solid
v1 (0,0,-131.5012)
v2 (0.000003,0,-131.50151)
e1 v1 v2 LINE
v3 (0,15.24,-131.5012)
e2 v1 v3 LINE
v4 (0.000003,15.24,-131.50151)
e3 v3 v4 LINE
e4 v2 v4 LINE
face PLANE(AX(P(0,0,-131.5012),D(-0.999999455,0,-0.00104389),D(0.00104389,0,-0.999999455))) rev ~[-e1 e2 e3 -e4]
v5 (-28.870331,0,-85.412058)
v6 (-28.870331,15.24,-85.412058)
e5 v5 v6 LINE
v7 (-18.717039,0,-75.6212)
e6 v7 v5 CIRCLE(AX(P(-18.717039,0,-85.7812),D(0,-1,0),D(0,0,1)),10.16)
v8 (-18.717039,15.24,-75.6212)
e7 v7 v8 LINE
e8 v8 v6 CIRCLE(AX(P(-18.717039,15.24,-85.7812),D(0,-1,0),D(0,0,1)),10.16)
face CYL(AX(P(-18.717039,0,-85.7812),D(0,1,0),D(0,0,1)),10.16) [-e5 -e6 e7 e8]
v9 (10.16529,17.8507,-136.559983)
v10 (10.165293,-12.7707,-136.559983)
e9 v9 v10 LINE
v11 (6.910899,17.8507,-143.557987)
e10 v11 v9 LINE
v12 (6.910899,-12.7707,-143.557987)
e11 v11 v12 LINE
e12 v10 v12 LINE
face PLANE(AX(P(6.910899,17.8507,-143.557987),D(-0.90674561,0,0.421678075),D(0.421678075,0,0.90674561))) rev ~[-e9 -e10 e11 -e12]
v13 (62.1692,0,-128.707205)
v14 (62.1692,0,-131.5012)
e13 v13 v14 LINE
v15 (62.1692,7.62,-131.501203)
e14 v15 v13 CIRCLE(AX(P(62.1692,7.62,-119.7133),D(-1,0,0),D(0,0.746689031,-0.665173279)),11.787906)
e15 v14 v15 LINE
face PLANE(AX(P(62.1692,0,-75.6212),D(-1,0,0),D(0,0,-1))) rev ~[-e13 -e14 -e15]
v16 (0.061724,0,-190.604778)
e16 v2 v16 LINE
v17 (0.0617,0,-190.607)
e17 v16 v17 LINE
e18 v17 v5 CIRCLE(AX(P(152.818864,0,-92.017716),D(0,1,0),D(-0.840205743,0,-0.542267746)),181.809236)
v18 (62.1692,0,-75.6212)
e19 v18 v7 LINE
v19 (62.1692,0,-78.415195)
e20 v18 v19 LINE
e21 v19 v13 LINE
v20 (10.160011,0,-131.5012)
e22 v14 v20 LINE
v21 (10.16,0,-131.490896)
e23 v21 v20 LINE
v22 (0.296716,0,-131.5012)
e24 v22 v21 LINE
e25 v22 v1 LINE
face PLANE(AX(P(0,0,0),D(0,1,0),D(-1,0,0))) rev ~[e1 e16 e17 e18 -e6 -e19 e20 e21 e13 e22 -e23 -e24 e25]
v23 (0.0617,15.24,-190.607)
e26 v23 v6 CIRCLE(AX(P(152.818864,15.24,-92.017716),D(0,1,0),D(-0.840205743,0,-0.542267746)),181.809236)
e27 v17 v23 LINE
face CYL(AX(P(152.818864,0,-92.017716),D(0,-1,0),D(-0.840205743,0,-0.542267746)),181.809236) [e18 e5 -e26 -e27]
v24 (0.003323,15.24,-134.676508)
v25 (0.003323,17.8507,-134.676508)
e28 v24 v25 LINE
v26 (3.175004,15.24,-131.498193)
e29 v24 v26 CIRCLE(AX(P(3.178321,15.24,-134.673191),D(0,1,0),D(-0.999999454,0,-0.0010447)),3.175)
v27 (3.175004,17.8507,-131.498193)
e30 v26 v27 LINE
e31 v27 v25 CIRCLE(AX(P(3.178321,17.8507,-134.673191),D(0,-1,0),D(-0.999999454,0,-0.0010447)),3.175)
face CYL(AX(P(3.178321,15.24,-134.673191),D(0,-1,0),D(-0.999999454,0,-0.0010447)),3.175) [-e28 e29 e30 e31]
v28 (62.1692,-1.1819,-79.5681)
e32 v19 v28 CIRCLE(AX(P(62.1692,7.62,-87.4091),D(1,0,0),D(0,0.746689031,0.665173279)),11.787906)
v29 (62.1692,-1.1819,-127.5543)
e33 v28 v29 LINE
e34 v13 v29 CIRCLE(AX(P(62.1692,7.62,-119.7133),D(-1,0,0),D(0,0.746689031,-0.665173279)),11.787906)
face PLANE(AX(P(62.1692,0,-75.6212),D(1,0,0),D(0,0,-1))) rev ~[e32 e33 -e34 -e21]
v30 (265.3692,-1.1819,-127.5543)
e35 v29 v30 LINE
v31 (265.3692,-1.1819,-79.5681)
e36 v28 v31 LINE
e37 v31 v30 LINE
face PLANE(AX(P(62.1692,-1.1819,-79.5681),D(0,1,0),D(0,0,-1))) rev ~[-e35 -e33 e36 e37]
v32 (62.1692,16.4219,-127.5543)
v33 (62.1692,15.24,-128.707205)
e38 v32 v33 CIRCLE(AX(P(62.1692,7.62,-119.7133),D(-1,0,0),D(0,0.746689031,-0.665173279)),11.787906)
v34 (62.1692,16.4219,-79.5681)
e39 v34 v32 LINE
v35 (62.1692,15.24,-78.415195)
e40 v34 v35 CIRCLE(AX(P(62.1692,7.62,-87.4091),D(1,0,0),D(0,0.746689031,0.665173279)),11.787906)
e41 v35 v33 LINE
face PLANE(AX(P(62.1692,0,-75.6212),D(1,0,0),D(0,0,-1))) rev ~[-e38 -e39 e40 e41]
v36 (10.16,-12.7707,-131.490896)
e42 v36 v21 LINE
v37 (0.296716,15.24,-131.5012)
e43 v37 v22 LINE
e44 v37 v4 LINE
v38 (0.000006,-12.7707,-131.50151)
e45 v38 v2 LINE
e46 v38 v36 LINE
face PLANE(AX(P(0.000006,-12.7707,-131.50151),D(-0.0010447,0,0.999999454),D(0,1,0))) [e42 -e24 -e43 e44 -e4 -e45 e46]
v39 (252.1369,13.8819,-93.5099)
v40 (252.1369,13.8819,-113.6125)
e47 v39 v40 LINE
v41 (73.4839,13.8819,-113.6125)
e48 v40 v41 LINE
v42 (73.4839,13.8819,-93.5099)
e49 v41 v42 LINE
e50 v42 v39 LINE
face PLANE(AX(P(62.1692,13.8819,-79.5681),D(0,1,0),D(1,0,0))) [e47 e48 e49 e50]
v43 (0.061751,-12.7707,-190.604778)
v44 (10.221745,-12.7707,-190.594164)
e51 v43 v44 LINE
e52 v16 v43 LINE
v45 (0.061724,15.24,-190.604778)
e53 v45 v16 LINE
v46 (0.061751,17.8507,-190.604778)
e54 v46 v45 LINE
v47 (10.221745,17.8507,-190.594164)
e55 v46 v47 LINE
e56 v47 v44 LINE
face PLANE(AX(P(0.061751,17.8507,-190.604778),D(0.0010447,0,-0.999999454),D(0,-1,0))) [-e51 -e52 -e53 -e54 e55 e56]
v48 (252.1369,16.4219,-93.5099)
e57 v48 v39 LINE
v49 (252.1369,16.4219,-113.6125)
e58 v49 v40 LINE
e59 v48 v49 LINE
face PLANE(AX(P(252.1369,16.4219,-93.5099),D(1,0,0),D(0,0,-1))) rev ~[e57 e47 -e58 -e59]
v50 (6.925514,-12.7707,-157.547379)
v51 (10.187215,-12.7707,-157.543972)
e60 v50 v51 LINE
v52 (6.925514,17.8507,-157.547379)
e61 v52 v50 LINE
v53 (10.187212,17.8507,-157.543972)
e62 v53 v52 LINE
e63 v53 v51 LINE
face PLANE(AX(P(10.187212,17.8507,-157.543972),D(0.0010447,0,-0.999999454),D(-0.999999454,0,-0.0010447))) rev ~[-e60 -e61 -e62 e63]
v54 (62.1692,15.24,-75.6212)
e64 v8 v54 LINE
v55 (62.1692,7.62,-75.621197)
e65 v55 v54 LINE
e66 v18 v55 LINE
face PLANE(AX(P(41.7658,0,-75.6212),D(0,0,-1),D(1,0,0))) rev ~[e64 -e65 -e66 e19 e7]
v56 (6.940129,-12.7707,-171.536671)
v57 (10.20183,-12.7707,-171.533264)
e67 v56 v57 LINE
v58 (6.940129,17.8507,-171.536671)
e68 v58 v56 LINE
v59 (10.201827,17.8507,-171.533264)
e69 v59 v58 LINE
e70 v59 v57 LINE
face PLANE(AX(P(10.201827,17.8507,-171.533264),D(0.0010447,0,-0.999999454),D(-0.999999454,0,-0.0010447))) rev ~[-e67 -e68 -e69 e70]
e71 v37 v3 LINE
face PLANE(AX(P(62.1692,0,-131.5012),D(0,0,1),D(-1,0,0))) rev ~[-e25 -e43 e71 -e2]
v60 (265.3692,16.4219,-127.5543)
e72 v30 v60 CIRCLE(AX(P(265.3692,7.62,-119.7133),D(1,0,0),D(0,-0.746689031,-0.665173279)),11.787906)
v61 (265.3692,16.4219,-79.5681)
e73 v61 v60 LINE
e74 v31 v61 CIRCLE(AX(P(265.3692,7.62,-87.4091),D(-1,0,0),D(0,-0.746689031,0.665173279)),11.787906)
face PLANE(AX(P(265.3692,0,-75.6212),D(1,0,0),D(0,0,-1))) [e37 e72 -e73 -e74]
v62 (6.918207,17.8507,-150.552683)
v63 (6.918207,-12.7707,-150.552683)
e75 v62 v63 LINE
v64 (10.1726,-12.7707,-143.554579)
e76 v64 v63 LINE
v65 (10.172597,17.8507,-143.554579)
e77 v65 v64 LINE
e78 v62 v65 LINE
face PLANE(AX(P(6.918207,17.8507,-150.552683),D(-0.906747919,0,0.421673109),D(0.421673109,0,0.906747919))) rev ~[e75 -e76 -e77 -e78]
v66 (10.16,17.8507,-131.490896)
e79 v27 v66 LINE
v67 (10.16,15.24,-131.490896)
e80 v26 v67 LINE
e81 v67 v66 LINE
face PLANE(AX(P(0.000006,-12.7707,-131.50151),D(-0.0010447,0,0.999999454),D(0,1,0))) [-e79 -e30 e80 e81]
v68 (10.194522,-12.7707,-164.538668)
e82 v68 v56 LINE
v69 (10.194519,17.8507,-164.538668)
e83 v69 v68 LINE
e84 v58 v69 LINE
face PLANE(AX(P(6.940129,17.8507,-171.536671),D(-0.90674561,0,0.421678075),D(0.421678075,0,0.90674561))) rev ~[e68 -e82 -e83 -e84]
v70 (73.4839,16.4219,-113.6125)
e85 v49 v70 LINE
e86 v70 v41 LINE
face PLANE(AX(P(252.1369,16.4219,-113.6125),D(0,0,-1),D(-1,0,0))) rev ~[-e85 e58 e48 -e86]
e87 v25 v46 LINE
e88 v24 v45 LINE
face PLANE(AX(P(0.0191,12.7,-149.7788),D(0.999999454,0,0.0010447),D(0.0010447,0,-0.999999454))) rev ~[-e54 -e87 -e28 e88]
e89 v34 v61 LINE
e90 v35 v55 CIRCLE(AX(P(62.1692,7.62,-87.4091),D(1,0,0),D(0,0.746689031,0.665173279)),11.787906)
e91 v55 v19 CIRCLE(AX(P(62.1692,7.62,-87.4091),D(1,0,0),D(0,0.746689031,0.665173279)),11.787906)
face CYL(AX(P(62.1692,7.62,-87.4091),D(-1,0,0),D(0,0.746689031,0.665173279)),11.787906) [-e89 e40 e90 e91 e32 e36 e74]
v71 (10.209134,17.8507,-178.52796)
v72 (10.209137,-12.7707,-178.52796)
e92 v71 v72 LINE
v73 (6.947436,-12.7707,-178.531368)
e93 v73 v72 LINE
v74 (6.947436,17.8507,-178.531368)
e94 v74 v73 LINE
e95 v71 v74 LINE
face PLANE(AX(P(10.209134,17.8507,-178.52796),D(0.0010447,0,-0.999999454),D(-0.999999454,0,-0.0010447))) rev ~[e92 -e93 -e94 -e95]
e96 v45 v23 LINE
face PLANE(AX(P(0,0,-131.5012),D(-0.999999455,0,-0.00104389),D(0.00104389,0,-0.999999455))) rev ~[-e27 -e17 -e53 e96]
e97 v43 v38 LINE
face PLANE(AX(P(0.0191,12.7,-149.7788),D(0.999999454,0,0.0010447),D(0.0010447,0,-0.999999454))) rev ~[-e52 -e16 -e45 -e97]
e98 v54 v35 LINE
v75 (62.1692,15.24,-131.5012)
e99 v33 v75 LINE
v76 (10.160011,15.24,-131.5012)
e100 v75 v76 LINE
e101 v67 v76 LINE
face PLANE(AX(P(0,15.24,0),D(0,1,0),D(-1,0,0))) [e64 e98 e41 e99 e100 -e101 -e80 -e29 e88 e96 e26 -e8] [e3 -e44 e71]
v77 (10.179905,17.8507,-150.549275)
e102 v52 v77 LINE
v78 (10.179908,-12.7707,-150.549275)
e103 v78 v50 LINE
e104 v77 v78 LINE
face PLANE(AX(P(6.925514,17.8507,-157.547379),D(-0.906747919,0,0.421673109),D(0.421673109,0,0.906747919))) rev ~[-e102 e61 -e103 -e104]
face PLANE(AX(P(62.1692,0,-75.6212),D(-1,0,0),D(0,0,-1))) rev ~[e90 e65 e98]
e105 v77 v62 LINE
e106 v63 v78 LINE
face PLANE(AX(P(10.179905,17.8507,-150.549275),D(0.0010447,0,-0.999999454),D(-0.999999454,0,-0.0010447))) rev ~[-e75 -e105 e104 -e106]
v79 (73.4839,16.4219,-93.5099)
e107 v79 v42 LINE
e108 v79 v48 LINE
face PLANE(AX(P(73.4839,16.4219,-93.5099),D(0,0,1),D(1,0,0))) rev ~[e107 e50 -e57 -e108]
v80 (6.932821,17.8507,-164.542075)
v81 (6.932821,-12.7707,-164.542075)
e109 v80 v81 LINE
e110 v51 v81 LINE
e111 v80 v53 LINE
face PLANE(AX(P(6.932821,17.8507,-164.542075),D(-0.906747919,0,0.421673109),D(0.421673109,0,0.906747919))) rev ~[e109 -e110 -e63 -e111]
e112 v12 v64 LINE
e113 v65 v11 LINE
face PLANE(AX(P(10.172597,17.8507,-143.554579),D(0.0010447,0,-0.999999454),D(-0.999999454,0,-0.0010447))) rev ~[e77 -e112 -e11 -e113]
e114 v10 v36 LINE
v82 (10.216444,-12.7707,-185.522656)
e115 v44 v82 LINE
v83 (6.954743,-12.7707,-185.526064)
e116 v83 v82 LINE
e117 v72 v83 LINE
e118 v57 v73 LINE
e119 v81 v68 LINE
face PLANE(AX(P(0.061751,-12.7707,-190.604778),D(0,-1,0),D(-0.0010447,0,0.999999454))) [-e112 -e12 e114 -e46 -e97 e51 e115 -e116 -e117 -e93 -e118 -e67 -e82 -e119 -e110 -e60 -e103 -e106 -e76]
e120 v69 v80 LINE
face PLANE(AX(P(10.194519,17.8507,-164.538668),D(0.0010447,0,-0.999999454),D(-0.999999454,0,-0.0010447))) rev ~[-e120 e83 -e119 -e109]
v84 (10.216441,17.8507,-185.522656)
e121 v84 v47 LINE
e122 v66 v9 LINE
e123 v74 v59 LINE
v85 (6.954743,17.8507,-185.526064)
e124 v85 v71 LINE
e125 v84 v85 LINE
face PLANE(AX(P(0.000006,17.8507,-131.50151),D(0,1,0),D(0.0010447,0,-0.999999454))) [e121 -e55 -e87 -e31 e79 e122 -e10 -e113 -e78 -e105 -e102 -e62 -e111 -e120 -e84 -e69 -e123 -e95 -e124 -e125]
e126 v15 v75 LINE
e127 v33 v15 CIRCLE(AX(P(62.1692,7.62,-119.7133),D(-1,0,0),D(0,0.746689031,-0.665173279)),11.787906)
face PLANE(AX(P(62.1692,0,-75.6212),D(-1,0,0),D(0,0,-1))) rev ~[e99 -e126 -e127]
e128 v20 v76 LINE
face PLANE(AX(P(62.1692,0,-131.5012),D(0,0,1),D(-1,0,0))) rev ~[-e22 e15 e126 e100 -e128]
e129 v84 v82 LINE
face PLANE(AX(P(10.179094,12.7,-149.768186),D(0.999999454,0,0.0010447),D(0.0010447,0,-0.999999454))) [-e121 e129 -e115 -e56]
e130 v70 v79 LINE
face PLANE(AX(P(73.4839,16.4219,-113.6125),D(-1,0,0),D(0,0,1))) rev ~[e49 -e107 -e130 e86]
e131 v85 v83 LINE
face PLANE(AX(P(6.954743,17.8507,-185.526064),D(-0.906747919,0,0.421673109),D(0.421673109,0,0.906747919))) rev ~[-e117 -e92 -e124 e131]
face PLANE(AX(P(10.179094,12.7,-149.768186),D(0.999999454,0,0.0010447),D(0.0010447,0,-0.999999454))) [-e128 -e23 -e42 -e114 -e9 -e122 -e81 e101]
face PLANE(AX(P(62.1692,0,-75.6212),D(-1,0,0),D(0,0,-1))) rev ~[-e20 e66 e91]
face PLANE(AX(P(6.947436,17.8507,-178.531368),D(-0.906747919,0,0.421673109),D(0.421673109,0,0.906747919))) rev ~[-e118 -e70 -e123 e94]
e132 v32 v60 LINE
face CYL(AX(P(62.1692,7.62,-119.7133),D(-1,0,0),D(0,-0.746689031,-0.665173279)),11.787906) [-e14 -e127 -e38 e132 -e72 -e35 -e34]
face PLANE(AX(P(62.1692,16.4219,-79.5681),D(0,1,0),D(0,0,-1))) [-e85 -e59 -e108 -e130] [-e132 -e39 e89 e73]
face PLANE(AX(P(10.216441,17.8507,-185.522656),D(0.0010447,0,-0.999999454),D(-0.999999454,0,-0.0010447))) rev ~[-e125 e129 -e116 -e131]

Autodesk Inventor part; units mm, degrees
ref_plane "YZ Plane" through (0, 0, 0) normal (1, 0, 0) x (0, 1, 0)
ref_plane "XZ Plane" through (0, 0, 0) normal (0, 1, 0) x (-1, 0, 0)
ref_plane "XY Plane" through (0, 0, 0) normal (0, 0, 1) x (1, 0, 0)
sketch "Sketch1" plane through (0, 0, 0) normal (0, 1, 0) x (-1, 0, 0)
  line L0 (0, -131.5012) -> (-0.0617, -190.607)
  line L1 (-41.7658, -131.5012) -> (53.7037, -131.5012) construction
  line L2 (28.2495, -75.6212) -> (-41.7658, -75.6212)
  arc A0 (-0.0617, -190.607) -> (28.2495, -75.6212) centre (-152.8189, -92.0177) ccw
  line L3 (28.2495, -75.6212) -> (-62.1692, -75.6212)
  line L4 (-62.1692, -75.6212) -> (-62.1692, -131.5012)
  line L5 (-62.1692, -131.5012) -> (0, -131.5012)
  point P0 (0, 0)
  point P1 (8.9112, -179.6369)
  point P2 (0, -75.6212)
  point P3 (-70.1734, -131.5012)
  dimension "d21" = 59.1058
  dimension "d37" = 70.0153
extrude "Extrusion1" add sketch "Sketch1" along normal blind 15.24
fillet "Fillet1" radius 10.16 1 edges at (-28.2495, 7.62, -75.6212)
sketch "Sketch4" plane through (0.0191, 12.7, -149.7788) normal (0.9999995, 0, 0.0010447) x (0.0010447, 0, -0.9999995)
  line L0 (0, -22.86) -> (0, 2.54)
  line L1 (15.9389, 2.54) -> (13.4561, 2.54) construction
  line L2 (13.4561, 2.54) -> (13.4561, 4.185) construction
  line L3 (13.6464, 2.54) -> (33.02, 2.54)
  line L4 (33.02, -22.86) -> (13.6464, -22.86)
  line L5 (-10.4713, -22.86) -> (-10.4713, 2.54) construction
  line L6 (-10.4713, -10.16) -> (33.02, -10.16) construction
  line L7 (-10.4713, -10.16) -> (11.2743, -10.16) construction
  line L8 (-18.2773, 5.1507) -> (40.826, 5.1507)
  line L9 (40.826, 5.1507) -> (40.826, -25.4707)
  line L10 (40.826, -25.4707) -> (-18.2773, -25.4707)
  line L11 (-18.2773, -25.4707) -> (-18.2773, 5.1507)
  line L12 (-18.2773, 5.1507) -> (40.826, -25.4707) construction
  line L13 (40.826, 5.1507) -> (-18.2773, -25.4707) construction
  point P0 (8.89, -10.16)
  dimension "d24" = 43.4913
  dimension "d23" = 21.7457
extrude "Extrusion4" add sketch "Sketch4" along normal blind 10.16
sketch "Sketch5" plane through (0, 17.8507, -131.5015) normal (0, 1, 0) x (0.9999995, 0, 0.0010447)
  line L0 (10.16, 0) -> (10.16, 59.1033) projected
  line L1 (10.16, 0) -> (10.16, 4.6168)
  line L2 (10.16, 0) -> (10.16, 6.604)
  line L3 (10.16, 59.1033) -> (10.16, 54.0318)
  line L4 (10.16, 54.0318) -> (6.8983, 54.0318)
  line L5 (6.8983, 54.0318) -> (10.16, 47.0371)
  line L6 (10.16, 3.5366) -> (10.16, 0)
  line L7 (10.16, 54.0318) -> (10.16, 59.1033)
  line L8 (10.16, 47.0371) -> (6.8983, 47.0371)
  line L9 (6.8983, 47.0371) -> (10.16, 40.0424)
  line L10 (10.16, 40.0424) -> (6.8983, 40.0424)
  line L11 (6.8983, 40.0424) -> (10.16, 33.0478)
  line L12 (10.16, 33.0478) -> (6.8983, 33.0478)
  line L13 (6.8983, 33.0478) -> (10.16, 26.0531)
  line L14 (10.16, 26.0531) -> (6.8983, 26.0531)
  line L15 (6.8983, 26.0531) -> (10.16, 19.0584)
  line L16 (10.16, 19.0584) -> (6.8983, 19.0584)
  line L17 (6.8983, 19.0584) -> (10.16, 12.0637)
  line L18 (10.16, 12.0637) -> (6.8983, 12.0637)
  line L19 (6.8983, 12.0637) -> (10.16, 5.0691)
  line L20 (10.16, 5.0691) -> (10.16, 54.0318)
  point P0 (-241.3, 27.1673)
  dimension "d30" = 5.0715
  dimension "d28" = 65
  dimension "d29" = 6.9947
extrude "Extrusion5" cut sketch "Sketch5" against normal through all
fillet "Fillet3" radius 3.175 1 edges at (0, 16.5453, -131.5015)
sketch "Sketch7" plane through (62.1692, 0, -75.6212) normal (1, 0, 0) x (0, 0, -1)
  line L0 (0, 15.24) -> (55.88, 15.24) projected
  line L1 (55.88, 0) -> (27.2823, 0)
  line L2 (27.94, 0) -> (41.91, 0) construction
  line L3 (55.88, 0) -> (55.88, 15.24) projected
  line L4 (55.88, 0) -> (27.94, 0)
  line L5 (9.7909, 0) -> (0, 0) projected
  line L6 (27.94, 0) -> (27.94, 15.24)
  line L7 (27.94, 15.24) -> (53.086, 15.24)
  line L8 (114.9858, 15.24) -> (9.7909, 15.24) projected
  arc A0 (51.9331, -1.1819) -> (51.9331, 16.4219) centre (44.0921, 7.62) ccw
  line L9 (51.9331, 16.4219) -> (51.9331, -1.1819) construction
  line L10 (51.9331, 16.4219) -> (69.5369, 16.4219) construction
  arc A1 (3.9469, 16.4219) -> (3.9469, -1.1819) centre (11.7879, 7.62) ccw
  line L11 (3.9469, 16.4219) -> (51.9331, 16.4219)
  line L12 (3.9469, -1.1819) -> (51.9331, -1.1819)
  point P0 (-75.6212, 0)
  dimension "d43" = 27.94
  dimension "d44" = 25.146
  dimension "d45" = 90
  dimension "d56" = 17.6038
extrude "Extrusion6" add sketch "Sketch7" along normal blind 203.2 contours L0 A1 L11 A0 | L0 L6 L1 A0 L12 A1 | L0 A0 L1 L6
sketch "Sketch8" plane through (62.1692, 16.4219, -79.5681) normal (0, 1, 0) x (1, 0, 0)
  line L0 (203.2, 47.9862) -> (203.2, 0) construction
  line L1 (203.2, 23.9931) -> (-91.0395, 23.9931) construction
  arc A0 (-62.1075, 111.0389) -> (-91.0395, 5.8439) centre (90.6496, 12.4496) ccw construction
  line L2 (-91.0395, 5.8439) -> (-91.0395, 27.6375) construction
  line L3 (-91.0395, 5.8439) -> (-69.2459, 5.8439) construction
  line L4 (203.2, 0) -> (56.0832, 0) construction
  line L5 (0, 0) -> (203.2, 0) construction
  line L6 (56.0832, 0) -> (56.0832, 60.6628) construction
  line L7 (-77.8013, 6.5731) -> (189.9677, 41.4131) construction
  line L8 (189.9677, 6.5731) -> (-77.8013, 41.4131) construction
  line L9 (11.3147, 13.9418) -> (189.9677, 13.9418)
  line L10 (189.9677, 13.9418) -> (189.9677, 34.0444)
  line L11 (189.9677, 34.0444) -> (11.3147, 34.0444)
  line L12 (11.3147, 34.0444) -> (11.3147, 13.9418)
  line L13 (11.3147, 13.9418) -> (189.9677, 34.0444) construction
  line L14 (189.9677, 13.9418) -> (11.3147, 34.0444) construction
  point P0 (-62.1692, -79.5681)
  point P1 (56.0832, 23.9931)
  point P2 (100.6412, 23.9931)
  dimension "d48" = 90
  dimension "d50" = 147.1168
extrude "Extrusion7" cut sketch "Sketch8" against normal blind 2.54
properties part number "Top"
